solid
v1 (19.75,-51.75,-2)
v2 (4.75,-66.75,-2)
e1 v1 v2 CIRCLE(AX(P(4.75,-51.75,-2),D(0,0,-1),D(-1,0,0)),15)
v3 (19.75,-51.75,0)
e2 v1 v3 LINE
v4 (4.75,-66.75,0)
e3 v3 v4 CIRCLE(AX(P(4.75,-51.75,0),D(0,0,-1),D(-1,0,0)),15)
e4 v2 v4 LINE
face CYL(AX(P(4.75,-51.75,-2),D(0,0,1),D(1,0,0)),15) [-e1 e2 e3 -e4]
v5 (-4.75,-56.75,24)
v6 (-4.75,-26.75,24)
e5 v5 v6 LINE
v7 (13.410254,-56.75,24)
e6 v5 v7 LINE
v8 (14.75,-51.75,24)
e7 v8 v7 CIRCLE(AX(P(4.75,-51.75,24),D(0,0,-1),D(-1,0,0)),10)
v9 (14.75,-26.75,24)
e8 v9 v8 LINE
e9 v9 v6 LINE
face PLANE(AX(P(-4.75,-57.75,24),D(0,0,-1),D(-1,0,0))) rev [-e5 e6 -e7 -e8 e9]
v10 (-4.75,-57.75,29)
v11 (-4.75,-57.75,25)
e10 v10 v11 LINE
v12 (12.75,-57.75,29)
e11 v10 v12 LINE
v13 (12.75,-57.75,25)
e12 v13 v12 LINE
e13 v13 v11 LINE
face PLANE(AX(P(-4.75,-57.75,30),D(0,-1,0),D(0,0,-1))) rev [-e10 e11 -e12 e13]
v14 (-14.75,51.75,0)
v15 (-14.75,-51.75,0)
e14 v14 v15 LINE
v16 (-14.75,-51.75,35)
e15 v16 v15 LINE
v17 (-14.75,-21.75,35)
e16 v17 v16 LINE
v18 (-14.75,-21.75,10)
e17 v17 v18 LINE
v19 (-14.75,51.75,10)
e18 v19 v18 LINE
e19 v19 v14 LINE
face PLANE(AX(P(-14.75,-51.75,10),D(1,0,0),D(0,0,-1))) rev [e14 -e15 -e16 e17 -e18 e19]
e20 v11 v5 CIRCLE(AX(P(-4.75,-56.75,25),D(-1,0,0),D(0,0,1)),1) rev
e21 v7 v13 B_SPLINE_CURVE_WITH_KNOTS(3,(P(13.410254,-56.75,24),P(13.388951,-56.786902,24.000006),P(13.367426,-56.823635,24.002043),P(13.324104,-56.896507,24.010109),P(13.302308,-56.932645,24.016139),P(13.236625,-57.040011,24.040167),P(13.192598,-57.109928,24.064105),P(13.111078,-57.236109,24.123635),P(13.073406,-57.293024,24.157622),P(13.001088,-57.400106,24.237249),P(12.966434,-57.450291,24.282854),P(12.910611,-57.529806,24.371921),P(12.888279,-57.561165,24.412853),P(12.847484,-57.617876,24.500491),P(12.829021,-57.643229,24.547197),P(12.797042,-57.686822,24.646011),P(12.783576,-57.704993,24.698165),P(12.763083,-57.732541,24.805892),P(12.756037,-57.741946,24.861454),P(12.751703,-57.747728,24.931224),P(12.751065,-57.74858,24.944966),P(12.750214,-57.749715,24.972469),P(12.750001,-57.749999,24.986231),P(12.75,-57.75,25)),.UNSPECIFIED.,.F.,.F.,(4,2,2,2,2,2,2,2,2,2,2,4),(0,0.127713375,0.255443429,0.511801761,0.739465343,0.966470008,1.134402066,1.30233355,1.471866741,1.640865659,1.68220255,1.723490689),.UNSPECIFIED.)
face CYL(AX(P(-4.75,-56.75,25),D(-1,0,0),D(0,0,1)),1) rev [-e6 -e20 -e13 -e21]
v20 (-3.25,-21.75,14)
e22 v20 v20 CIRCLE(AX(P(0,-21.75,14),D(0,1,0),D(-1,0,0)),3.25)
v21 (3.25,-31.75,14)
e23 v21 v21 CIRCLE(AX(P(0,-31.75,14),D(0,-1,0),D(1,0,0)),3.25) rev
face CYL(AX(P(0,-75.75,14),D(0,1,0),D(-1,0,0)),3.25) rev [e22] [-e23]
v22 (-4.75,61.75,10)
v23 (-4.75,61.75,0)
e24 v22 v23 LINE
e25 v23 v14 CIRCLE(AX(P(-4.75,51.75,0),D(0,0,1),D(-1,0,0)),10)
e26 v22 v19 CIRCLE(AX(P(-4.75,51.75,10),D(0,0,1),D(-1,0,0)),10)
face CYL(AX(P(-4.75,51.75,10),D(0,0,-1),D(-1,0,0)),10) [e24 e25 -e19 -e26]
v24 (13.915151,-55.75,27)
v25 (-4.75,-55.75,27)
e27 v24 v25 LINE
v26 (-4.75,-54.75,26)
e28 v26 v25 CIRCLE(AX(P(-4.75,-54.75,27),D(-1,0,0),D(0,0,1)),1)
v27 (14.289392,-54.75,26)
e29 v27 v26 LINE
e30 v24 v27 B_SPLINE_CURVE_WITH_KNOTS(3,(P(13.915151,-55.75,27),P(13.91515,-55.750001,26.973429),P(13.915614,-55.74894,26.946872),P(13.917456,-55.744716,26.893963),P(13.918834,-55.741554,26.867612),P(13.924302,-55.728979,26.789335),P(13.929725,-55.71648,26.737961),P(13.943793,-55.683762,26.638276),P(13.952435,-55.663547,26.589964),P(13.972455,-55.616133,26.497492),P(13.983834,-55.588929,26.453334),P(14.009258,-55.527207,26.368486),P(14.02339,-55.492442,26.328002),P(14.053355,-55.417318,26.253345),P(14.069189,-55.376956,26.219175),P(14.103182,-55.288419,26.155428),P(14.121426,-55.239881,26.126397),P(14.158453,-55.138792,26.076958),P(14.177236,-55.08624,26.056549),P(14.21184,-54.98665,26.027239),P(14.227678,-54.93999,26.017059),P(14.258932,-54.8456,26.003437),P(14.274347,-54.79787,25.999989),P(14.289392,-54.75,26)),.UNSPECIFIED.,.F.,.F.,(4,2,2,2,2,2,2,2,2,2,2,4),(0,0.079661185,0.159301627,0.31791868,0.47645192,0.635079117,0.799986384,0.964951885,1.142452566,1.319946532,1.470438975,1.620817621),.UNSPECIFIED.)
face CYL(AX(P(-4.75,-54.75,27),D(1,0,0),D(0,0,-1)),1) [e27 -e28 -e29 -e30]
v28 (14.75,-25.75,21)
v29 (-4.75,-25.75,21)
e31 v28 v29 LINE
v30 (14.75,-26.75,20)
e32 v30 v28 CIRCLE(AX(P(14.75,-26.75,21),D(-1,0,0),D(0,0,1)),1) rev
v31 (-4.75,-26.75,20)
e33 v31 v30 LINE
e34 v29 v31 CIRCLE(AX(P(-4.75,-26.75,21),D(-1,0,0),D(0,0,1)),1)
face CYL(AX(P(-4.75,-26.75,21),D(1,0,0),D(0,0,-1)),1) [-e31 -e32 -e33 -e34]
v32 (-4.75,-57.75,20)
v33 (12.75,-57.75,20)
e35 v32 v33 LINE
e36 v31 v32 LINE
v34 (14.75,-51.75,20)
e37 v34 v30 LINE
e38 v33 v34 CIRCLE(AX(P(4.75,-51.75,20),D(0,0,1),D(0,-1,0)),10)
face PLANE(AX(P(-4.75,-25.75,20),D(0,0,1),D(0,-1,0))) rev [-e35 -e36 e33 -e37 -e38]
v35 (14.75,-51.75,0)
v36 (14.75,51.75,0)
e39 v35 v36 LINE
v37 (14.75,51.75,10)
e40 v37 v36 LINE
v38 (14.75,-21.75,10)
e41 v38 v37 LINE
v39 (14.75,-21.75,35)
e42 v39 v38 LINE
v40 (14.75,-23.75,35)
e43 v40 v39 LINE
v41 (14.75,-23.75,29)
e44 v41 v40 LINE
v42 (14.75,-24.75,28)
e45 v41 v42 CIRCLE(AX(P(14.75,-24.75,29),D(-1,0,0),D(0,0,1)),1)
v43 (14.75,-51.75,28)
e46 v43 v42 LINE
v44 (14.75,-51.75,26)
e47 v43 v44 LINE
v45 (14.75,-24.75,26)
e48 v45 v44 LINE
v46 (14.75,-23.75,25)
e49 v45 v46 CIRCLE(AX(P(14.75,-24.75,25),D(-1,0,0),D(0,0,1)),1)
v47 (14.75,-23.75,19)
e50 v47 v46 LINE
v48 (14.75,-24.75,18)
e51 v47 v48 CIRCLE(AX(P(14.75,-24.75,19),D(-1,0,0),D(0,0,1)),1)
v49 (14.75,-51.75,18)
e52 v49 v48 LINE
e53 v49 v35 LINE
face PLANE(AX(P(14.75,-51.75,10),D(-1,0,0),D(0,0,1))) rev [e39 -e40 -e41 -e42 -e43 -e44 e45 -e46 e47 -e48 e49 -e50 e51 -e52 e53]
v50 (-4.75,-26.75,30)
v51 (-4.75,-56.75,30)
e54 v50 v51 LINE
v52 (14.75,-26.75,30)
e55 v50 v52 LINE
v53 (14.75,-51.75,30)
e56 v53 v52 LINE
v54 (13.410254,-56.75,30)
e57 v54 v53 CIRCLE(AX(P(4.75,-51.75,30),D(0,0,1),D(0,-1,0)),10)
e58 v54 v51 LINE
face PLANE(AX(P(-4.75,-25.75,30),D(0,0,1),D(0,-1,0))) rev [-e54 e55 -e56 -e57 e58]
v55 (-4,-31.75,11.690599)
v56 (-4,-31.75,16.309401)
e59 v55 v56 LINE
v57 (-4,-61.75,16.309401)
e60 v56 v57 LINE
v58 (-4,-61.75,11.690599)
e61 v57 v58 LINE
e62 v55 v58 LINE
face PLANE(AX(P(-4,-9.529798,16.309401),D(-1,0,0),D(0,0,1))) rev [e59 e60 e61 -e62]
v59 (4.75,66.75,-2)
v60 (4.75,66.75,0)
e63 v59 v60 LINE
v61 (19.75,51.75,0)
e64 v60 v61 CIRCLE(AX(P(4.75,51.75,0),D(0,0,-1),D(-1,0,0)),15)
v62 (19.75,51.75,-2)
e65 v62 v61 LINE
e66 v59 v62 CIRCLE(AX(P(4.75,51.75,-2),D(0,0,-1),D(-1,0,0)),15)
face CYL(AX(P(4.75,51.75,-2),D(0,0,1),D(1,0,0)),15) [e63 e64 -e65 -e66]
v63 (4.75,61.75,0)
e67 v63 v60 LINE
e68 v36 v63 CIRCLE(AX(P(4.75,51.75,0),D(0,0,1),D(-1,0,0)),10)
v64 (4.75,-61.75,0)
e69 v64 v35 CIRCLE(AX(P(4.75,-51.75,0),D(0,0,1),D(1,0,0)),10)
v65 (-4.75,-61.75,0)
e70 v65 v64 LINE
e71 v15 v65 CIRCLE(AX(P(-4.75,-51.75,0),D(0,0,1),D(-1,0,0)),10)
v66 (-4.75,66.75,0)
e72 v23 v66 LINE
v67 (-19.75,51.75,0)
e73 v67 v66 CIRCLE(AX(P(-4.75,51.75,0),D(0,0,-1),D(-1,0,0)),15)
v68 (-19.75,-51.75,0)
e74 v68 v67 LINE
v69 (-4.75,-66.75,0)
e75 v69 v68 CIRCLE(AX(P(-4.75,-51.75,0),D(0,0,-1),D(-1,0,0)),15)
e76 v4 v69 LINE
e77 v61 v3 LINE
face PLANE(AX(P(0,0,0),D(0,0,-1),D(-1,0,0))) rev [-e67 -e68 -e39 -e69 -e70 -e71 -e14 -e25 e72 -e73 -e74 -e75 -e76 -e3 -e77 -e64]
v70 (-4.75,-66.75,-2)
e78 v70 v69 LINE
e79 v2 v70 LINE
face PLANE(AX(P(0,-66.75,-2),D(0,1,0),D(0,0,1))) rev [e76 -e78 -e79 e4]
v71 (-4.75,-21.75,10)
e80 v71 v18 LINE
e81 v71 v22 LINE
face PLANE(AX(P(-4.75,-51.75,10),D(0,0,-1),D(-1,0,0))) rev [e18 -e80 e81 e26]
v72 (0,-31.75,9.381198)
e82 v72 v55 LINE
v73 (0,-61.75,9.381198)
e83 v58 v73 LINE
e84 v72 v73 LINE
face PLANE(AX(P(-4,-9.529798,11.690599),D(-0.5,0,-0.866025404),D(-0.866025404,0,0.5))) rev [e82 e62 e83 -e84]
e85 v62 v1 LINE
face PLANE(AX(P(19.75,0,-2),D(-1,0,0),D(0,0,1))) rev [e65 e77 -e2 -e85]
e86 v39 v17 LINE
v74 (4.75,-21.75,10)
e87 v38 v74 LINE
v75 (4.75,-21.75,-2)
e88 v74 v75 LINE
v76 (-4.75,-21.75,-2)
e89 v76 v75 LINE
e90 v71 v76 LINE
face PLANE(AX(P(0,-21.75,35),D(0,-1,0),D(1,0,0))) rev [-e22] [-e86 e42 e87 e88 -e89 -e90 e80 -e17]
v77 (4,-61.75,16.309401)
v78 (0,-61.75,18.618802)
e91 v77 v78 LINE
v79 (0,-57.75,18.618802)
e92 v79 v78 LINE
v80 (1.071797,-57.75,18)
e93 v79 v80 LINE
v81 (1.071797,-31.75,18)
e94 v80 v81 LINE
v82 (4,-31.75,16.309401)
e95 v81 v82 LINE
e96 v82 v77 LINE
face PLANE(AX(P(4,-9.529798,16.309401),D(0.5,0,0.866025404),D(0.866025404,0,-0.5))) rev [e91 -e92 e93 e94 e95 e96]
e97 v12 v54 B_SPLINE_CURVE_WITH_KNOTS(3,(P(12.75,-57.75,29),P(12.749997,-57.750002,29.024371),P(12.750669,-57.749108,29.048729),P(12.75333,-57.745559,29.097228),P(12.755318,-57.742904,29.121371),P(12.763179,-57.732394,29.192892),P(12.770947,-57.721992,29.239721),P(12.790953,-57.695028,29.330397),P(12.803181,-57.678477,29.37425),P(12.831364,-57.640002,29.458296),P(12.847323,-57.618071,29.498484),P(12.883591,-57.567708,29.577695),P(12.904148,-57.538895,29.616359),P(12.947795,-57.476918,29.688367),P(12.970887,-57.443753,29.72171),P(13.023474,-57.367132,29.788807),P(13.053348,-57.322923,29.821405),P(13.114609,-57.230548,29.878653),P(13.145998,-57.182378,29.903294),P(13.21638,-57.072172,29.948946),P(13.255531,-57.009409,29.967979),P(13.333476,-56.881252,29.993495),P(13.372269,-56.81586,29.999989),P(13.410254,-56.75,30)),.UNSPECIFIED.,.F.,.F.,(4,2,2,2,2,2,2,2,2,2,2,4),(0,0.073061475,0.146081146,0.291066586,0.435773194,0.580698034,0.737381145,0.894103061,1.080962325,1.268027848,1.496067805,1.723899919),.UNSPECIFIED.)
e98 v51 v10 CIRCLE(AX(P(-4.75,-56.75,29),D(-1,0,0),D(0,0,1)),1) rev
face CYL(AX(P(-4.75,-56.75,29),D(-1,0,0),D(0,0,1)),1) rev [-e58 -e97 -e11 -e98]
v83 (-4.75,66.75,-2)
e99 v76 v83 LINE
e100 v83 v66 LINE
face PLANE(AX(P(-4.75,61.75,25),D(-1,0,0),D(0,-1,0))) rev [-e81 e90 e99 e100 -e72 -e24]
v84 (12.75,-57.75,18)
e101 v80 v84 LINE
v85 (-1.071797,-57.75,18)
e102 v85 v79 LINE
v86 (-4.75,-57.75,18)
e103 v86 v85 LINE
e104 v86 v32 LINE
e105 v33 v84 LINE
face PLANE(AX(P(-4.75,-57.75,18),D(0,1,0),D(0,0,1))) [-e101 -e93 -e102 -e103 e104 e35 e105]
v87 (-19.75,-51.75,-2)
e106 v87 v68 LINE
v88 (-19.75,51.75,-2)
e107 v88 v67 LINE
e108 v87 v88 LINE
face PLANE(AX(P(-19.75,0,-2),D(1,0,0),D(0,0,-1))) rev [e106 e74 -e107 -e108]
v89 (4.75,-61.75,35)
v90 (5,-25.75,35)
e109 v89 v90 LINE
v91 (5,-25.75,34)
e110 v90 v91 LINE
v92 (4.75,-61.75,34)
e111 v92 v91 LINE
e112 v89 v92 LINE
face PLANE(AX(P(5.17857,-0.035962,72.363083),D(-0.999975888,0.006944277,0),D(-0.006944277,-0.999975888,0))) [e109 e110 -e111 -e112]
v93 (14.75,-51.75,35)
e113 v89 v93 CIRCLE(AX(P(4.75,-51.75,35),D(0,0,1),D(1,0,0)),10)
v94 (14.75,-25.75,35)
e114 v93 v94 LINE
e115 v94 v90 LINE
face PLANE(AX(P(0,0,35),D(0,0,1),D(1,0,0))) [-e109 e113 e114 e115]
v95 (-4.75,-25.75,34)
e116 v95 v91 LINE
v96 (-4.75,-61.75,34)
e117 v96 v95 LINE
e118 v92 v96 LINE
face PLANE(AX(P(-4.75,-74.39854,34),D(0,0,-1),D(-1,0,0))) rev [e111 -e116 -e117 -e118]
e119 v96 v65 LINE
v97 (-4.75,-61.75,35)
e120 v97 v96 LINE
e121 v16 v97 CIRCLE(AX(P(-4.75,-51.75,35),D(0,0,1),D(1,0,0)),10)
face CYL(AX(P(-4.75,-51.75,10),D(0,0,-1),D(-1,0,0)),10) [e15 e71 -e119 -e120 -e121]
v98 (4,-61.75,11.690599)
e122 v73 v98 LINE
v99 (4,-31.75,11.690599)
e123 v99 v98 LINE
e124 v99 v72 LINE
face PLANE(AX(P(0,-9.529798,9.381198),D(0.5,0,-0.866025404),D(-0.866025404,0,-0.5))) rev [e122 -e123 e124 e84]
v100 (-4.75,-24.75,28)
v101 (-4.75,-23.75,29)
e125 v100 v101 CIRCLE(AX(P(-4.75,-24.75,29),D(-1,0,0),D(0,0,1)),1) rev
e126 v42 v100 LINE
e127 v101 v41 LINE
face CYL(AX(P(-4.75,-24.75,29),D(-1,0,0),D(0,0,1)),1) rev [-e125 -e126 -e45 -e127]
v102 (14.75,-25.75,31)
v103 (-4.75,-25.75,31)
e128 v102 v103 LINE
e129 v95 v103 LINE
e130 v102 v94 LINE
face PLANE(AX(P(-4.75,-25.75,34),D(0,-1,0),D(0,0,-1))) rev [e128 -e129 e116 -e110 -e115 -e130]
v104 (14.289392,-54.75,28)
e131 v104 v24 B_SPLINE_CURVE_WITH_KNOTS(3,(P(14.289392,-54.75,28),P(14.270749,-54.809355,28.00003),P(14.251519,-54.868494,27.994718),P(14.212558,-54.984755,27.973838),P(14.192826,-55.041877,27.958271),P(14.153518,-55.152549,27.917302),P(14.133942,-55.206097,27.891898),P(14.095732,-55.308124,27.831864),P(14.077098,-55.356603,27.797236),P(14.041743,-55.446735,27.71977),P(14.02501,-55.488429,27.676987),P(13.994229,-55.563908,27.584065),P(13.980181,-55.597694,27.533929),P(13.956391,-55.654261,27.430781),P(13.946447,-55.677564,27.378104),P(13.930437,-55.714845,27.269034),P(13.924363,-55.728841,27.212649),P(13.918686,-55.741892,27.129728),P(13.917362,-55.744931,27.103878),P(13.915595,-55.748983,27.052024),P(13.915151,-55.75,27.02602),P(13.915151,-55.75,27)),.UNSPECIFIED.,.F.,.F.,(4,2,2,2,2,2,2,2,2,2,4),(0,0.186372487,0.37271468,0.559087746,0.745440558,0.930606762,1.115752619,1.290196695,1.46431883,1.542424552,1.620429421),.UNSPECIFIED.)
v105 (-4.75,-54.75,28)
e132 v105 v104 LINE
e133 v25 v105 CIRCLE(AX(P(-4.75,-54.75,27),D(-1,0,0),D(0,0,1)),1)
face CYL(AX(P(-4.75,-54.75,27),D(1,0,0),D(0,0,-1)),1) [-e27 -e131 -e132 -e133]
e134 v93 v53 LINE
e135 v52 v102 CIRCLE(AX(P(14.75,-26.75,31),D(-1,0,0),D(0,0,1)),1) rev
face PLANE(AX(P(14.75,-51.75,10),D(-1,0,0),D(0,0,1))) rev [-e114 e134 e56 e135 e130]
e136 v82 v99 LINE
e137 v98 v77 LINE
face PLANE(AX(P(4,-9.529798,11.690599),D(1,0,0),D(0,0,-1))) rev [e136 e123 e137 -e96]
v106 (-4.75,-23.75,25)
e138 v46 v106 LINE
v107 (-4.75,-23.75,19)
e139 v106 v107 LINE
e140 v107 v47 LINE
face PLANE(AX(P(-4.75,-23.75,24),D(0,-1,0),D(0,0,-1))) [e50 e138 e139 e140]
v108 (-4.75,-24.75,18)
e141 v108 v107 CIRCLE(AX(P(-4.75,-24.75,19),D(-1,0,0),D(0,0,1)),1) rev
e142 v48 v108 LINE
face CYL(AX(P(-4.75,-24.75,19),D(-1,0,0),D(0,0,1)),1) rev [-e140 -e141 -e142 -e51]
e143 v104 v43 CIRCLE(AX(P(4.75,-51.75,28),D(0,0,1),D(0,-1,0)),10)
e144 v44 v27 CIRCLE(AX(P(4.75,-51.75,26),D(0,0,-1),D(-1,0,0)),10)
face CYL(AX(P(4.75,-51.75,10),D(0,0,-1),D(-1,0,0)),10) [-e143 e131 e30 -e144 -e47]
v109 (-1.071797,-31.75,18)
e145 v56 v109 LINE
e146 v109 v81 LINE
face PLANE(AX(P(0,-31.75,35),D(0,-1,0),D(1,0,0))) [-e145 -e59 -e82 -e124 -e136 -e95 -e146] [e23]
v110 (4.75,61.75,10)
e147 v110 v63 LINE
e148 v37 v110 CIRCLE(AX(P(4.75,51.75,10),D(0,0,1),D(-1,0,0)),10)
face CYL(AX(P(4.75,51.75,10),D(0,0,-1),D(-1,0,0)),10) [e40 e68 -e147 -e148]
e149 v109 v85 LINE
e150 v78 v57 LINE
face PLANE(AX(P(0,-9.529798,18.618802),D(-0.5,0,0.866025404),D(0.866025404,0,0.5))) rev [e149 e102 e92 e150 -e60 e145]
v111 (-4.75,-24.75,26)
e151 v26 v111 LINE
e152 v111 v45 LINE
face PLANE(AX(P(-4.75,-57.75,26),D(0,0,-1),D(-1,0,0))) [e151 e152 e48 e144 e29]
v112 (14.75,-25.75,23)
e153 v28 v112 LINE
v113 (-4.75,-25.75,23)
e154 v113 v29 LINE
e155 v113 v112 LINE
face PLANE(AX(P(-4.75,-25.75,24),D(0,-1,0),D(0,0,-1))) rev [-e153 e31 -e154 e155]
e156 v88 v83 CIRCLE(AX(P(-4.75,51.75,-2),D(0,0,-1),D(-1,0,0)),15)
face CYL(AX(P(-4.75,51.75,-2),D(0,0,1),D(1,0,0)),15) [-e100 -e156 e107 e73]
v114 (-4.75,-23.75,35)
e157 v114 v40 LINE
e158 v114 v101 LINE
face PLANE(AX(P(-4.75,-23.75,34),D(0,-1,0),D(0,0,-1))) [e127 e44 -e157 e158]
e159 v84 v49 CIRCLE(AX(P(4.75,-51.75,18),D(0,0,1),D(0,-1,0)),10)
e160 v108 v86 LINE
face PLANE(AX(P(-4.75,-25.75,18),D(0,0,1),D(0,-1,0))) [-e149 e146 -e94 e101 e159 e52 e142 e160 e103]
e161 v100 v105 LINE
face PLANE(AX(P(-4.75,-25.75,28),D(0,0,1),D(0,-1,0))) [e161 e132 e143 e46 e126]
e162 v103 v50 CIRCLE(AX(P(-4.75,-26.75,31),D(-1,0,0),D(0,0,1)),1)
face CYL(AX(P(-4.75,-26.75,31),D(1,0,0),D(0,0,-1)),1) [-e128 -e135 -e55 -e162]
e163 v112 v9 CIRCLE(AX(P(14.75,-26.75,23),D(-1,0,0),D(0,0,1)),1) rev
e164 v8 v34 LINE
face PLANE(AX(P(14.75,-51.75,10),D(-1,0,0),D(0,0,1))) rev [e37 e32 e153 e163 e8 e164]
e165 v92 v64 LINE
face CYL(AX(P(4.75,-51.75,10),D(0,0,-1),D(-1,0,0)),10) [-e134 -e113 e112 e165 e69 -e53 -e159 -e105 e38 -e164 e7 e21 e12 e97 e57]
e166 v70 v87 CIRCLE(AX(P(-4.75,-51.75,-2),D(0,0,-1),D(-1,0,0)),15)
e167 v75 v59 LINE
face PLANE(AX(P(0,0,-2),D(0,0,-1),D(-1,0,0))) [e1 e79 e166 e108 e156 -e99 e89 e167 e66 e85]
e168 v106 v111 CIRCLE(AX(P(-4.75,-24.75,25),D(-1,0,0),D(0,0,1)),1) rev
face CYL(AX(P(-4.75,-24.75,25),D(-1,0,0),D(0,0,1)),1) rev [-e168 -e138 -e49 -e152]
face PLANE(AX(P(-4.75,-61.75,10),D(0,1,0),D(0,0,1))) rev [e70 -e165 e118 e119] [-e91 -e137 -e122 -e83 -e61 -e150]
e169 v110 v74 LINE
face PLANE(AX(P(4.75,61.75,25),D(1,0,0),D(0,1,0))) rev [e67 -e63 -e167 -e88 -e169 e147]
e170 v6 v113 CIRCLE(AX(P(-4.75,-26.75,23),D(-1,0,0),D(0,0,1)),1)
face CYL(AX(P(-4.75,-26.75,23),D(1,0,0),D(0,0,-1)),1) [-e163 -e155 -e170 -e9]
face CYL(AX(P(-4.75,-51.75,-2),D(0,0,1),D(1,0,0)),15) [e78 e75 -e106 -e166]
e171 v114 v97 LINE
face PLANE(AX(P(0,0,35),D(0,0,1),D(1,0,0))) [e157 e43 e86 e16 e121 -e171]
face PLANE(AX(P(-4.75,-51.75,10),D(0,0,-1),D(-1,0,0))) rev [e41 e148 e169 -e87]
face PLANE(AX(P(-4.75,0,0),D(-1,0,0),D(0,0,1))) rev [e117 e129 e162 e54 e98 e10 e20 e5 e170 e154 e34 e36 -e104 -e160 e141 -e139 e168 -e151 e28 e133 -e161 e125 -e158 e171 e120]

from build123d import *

# Parameters (mm, degrees)
BOSS_EXTRUDE1_DEPTH          = 10
BOSS_EXTRUDE2_DEPTH          = 25
CUT_EXTRUDE_THIN1_DEPTH      = 77.865548199
CUT_EXTRUDE_THIN1_DEPTH_BACK = 19.5
SKETCH5_W                    = 9.5
SKETCH5_H                    = 83.5
CUT_EXTRUDE1_DEPTH           = 25
FILLET2_R                    = 1
SKETCH8_R                    = 3.25
CUT_EXTRUDE2_DEPTH           = 54
CUT_EXTRUDE3_DEPTH           = 30
BOSS_EXTRUDE5_START          = 2
BOSS_EXTRUDE5_DEPTH          = 2
BOSS_EXTRUDE6_DEPTH          = 1


with BuildPart() as part:
    # Sketch1 → Boss-Extrude1 (new body)
    with BuildSketch(Plane.XY):
        with BuildLine():
            Line((-4.75, -61.75), (4.75, -61.75))
            ThreePointArc((4.75, -61.75), (11.821067812, -58.821067812), (14.75, -51.75))
            Line((14.75, -51.75), (14.75, 51.75))
            ThreePointArc((14.75, 51.75), (11.821067812, 58.821067812), (4.75, 61.75))
            Line((4.75, 61.75), (-4.75, 61.75))
            ThreePointArc((-4.75, 61.75), (-11.821067812, 58.821067812), (-14.75, 51.75))
            Line((-14.75, 51.75), (-14.75, -51.75))
            ThreePointArc((-14.75, -51.75), (-11.821067812, -58.821067812), (-4.75, -61.75))
        make_face()
    extrude(amount=BOSS_EXTRUDE1_DEPTH)

    # Sketch3 → Boss-Extrude2 (add)
    with BuildSketch(Plane.XY.offset(10)):
        with BuildLine():
            Line((14.75, -51.75), (14.75, -21.75))
            Line((14.75, -21.75), (-14.75, -21.75))
            Line((-14.75, -21.75), (-14.75, -51.75))
            ThreePointArc((-14.75, -51.75), (-11.821067812, -58.821067812), (-4.75, -61.75))
            Line((-4.75, -61.75), (4.75, -61.75))
            ThreePointArc((4.75, -61.75), (11.821067812, -58.821067812), (14.75, -51.75))
        make_face()
    extrude(amount=BOSS_EXTRUDE2_DEPTH)

    # Sketch4 → Cut-Extrude-Thin1 (cut, two sides: drawn at the far end of the back side and taken through both)
    with BuildSketch(Plane(origin=(14.75, 0, 0), x_dir=(0, 0, -1), z_dir=(1, 0, 0)).offset(-CUT_EXTRUDE_THIN1_DEPTH_BACK)):
        Polygon((-34, -74.39853969), (-34, -25.75), (-30, -25.75), (-30, -57.75), (-24, -57.75), (-24, -25.75), (-20, -25.75), (-20, -57.75), (-18, -57.75), (-18, -23.75), (-26, -23.75), (-26, -55.75), (-28, -55.75), (-28, -23.75), (-36, -23.75), (-36, -74.39853969), align=None)
    extrude(amount=CUT_EXTRUDE_THIN1_DEPTH + CUT_EXTRUDE_THIN1_DEPTH_BACK, mode=Mode.SUBTRACT)

    # Sketch5 → Cut-Extrude1 (cut)
    with BuildSketch(Plane(origin=(0, 0, 0), x_dir=(-1, 0, 0), z_dir=(0, 0, -1))):
        with Locations((0, 20)):
            Rectangle(SKETCH5_W, SKETCH5_H)
    extrude(amount=-CUT_EXTRUDE1_DEPTH, mode=Mode.SUBTRACT)

    # Fillet2
    fillet2_edges = [part.edges().sort_by_distance(p)[0] for p in [
        (5, -25.75, 24),
        (4, -57.75, 30),
        (4, -57.75, 24),
        (5, -25.75, 20),
        (5, -23.75, 18),
        (5, -23.75, 28),
        (5, -23.75, 26),
        (4.582575695, -55.75, 26),
        (4.582575695, -55.75, 28),
        (5, -25.75, 30),
    ]]
    fillet(fillet2_edges, radius=FILLET2_R - 0.0001)  # a hair under: the kernel refuses the full size

    # Sketch8 → Cut-Extrude2 (cut)
    with BuildSketch(Plane(origin=(0, -21.75, 0), x_dir=(1, 0, 0), z_dir=(0, 1, 0))):
        with Locations(Location((0, -14, 0), (0, 0, 180))):
            Circle(SKETCH8_R)
    extrude(amount=-CUT_EXTRUDE2_DEPTH, mode=Mode.SUBTRACT)

    # Sketch9 → Cut-Extrude3 (cut)
    with BuildSketch(Plane(origin=(0, -61.75, 0), x_dir=(-1, 0, 0), z_dir=(0, -1, 0))):
        Polygon((0, -9.381197846), (-4, -11.690598923), (-4, -16.309401077), (0, -18.618802154), (4, -16.309401077), (4, -11.690598923), align=None)
    extrude(amount=-CUT_EXTRUDE3_DEPTH, mode=Mode.SUBTRACT)

    # Sketch11 → Boss-Extrude5 (add)
    with BuildSketch(Plane(origin=(0, 0, 0), x_dir=(-1, 0, 0), z_dir=(0, 0, -1)).offset(BOSS_EXTRUDE5_START)):
        with BuildLine():
            Line((-4.75, -66.75), (4.75, -66.75))
            ThreePointArc((4.75, -66.75), (15.356601718, -62.356601718), (19.75, -51.75))
            Line((19.75, -51.75), (19.75, 51.75))
            ThreePointArc((19.75, 51.75), (15.356601718, 62.356601718), (4.75, 66.75))
            Line((4.75, 66.75), (4.75, 61.75))
            ThreePointArc((4.75, 61.75), (11.821067812, 58.821067812), (14.75, 51.75))
            Line((14.75, 51.75), (14.75, -51.75))
            ThreePointArc((14.75, -51.75), (11.821067812, -58.821067812), (4.75, -61.75))
            Line((4.75, -61.75), (-4.75, -61.75))
            ThreePointArc((-4.75, -61.75), (-11.821067812, -58.821067812), (-14.75, -51.75))
            Line((-14.75, -51.75), (-14.75, 51.75))
            ThreePointArc((-14.75, 51.75), (-11.821067812, 58.821067812), (-4.75, 61.75))
            Line((-4.75, 61.75), (-4.75, 66.75))
            ThreePointArc((-4.75, 66.75), (-15.356601718, 62.356601718), (-19.75, 51.75))
            Line((-19.75, 51.75), (-19.75, -51.75))
            ThreePointArc((-19.75, -51.75), (-15.356601718, -62.356601718), (-4.75, -66.75))
        make_face()
        with BuildLine():
            ThreePointArc((14.75, 51.75), (11.821067812, 58.821067812), (4.75, 61.75))
            Line((4.75, 61.75), (4.75, -21.75))
            Line((4.75, -21.75), (-4.75, -21.75))
            Line((-4.75, -21.75), (-4.75, 61.75))
            ThreePointArc((-4.75, 61.75), (-11.821067812, 58.821067812), (-14.75, 51.75))
            Line((-14.75, 51.75), (-14.75, -51.75))
            ThreePointArc((-14.75, -51.75), (-11.821067812, -58.821067812), (-4.75, -61.75))
            Line((-4.75, -61.75), (4.75, -61.75))
            ThreePointArc((4.75, -61.75), (11.821067812, -58.821067812), (14.75, -51.75))
            Line((14.75, -51.75), (14.75, 51.75))
        make_face()
    extrude(amount=-BOSS_EXTRUDE5_DEPTH)

    # Sketch12 → Boss-Extrude6 (add)
    with BuildSketch(Plane.XY.offset(34)):
        with BuildLine():
            Line((5, -25.75), (4.75, -61.75))
            ThreePointArc((4.75, -61.75), (11.821067812, -58.821067812), (14.75, -51.75))
            Line((14.75, -51.75), (14.75, -25.75))
            Line((14.75, -25.75), (5, -25.75))
        make_face()
    extrude(amount=BOSS_EXTRUDE6_DEPTH)


solid = part.part
